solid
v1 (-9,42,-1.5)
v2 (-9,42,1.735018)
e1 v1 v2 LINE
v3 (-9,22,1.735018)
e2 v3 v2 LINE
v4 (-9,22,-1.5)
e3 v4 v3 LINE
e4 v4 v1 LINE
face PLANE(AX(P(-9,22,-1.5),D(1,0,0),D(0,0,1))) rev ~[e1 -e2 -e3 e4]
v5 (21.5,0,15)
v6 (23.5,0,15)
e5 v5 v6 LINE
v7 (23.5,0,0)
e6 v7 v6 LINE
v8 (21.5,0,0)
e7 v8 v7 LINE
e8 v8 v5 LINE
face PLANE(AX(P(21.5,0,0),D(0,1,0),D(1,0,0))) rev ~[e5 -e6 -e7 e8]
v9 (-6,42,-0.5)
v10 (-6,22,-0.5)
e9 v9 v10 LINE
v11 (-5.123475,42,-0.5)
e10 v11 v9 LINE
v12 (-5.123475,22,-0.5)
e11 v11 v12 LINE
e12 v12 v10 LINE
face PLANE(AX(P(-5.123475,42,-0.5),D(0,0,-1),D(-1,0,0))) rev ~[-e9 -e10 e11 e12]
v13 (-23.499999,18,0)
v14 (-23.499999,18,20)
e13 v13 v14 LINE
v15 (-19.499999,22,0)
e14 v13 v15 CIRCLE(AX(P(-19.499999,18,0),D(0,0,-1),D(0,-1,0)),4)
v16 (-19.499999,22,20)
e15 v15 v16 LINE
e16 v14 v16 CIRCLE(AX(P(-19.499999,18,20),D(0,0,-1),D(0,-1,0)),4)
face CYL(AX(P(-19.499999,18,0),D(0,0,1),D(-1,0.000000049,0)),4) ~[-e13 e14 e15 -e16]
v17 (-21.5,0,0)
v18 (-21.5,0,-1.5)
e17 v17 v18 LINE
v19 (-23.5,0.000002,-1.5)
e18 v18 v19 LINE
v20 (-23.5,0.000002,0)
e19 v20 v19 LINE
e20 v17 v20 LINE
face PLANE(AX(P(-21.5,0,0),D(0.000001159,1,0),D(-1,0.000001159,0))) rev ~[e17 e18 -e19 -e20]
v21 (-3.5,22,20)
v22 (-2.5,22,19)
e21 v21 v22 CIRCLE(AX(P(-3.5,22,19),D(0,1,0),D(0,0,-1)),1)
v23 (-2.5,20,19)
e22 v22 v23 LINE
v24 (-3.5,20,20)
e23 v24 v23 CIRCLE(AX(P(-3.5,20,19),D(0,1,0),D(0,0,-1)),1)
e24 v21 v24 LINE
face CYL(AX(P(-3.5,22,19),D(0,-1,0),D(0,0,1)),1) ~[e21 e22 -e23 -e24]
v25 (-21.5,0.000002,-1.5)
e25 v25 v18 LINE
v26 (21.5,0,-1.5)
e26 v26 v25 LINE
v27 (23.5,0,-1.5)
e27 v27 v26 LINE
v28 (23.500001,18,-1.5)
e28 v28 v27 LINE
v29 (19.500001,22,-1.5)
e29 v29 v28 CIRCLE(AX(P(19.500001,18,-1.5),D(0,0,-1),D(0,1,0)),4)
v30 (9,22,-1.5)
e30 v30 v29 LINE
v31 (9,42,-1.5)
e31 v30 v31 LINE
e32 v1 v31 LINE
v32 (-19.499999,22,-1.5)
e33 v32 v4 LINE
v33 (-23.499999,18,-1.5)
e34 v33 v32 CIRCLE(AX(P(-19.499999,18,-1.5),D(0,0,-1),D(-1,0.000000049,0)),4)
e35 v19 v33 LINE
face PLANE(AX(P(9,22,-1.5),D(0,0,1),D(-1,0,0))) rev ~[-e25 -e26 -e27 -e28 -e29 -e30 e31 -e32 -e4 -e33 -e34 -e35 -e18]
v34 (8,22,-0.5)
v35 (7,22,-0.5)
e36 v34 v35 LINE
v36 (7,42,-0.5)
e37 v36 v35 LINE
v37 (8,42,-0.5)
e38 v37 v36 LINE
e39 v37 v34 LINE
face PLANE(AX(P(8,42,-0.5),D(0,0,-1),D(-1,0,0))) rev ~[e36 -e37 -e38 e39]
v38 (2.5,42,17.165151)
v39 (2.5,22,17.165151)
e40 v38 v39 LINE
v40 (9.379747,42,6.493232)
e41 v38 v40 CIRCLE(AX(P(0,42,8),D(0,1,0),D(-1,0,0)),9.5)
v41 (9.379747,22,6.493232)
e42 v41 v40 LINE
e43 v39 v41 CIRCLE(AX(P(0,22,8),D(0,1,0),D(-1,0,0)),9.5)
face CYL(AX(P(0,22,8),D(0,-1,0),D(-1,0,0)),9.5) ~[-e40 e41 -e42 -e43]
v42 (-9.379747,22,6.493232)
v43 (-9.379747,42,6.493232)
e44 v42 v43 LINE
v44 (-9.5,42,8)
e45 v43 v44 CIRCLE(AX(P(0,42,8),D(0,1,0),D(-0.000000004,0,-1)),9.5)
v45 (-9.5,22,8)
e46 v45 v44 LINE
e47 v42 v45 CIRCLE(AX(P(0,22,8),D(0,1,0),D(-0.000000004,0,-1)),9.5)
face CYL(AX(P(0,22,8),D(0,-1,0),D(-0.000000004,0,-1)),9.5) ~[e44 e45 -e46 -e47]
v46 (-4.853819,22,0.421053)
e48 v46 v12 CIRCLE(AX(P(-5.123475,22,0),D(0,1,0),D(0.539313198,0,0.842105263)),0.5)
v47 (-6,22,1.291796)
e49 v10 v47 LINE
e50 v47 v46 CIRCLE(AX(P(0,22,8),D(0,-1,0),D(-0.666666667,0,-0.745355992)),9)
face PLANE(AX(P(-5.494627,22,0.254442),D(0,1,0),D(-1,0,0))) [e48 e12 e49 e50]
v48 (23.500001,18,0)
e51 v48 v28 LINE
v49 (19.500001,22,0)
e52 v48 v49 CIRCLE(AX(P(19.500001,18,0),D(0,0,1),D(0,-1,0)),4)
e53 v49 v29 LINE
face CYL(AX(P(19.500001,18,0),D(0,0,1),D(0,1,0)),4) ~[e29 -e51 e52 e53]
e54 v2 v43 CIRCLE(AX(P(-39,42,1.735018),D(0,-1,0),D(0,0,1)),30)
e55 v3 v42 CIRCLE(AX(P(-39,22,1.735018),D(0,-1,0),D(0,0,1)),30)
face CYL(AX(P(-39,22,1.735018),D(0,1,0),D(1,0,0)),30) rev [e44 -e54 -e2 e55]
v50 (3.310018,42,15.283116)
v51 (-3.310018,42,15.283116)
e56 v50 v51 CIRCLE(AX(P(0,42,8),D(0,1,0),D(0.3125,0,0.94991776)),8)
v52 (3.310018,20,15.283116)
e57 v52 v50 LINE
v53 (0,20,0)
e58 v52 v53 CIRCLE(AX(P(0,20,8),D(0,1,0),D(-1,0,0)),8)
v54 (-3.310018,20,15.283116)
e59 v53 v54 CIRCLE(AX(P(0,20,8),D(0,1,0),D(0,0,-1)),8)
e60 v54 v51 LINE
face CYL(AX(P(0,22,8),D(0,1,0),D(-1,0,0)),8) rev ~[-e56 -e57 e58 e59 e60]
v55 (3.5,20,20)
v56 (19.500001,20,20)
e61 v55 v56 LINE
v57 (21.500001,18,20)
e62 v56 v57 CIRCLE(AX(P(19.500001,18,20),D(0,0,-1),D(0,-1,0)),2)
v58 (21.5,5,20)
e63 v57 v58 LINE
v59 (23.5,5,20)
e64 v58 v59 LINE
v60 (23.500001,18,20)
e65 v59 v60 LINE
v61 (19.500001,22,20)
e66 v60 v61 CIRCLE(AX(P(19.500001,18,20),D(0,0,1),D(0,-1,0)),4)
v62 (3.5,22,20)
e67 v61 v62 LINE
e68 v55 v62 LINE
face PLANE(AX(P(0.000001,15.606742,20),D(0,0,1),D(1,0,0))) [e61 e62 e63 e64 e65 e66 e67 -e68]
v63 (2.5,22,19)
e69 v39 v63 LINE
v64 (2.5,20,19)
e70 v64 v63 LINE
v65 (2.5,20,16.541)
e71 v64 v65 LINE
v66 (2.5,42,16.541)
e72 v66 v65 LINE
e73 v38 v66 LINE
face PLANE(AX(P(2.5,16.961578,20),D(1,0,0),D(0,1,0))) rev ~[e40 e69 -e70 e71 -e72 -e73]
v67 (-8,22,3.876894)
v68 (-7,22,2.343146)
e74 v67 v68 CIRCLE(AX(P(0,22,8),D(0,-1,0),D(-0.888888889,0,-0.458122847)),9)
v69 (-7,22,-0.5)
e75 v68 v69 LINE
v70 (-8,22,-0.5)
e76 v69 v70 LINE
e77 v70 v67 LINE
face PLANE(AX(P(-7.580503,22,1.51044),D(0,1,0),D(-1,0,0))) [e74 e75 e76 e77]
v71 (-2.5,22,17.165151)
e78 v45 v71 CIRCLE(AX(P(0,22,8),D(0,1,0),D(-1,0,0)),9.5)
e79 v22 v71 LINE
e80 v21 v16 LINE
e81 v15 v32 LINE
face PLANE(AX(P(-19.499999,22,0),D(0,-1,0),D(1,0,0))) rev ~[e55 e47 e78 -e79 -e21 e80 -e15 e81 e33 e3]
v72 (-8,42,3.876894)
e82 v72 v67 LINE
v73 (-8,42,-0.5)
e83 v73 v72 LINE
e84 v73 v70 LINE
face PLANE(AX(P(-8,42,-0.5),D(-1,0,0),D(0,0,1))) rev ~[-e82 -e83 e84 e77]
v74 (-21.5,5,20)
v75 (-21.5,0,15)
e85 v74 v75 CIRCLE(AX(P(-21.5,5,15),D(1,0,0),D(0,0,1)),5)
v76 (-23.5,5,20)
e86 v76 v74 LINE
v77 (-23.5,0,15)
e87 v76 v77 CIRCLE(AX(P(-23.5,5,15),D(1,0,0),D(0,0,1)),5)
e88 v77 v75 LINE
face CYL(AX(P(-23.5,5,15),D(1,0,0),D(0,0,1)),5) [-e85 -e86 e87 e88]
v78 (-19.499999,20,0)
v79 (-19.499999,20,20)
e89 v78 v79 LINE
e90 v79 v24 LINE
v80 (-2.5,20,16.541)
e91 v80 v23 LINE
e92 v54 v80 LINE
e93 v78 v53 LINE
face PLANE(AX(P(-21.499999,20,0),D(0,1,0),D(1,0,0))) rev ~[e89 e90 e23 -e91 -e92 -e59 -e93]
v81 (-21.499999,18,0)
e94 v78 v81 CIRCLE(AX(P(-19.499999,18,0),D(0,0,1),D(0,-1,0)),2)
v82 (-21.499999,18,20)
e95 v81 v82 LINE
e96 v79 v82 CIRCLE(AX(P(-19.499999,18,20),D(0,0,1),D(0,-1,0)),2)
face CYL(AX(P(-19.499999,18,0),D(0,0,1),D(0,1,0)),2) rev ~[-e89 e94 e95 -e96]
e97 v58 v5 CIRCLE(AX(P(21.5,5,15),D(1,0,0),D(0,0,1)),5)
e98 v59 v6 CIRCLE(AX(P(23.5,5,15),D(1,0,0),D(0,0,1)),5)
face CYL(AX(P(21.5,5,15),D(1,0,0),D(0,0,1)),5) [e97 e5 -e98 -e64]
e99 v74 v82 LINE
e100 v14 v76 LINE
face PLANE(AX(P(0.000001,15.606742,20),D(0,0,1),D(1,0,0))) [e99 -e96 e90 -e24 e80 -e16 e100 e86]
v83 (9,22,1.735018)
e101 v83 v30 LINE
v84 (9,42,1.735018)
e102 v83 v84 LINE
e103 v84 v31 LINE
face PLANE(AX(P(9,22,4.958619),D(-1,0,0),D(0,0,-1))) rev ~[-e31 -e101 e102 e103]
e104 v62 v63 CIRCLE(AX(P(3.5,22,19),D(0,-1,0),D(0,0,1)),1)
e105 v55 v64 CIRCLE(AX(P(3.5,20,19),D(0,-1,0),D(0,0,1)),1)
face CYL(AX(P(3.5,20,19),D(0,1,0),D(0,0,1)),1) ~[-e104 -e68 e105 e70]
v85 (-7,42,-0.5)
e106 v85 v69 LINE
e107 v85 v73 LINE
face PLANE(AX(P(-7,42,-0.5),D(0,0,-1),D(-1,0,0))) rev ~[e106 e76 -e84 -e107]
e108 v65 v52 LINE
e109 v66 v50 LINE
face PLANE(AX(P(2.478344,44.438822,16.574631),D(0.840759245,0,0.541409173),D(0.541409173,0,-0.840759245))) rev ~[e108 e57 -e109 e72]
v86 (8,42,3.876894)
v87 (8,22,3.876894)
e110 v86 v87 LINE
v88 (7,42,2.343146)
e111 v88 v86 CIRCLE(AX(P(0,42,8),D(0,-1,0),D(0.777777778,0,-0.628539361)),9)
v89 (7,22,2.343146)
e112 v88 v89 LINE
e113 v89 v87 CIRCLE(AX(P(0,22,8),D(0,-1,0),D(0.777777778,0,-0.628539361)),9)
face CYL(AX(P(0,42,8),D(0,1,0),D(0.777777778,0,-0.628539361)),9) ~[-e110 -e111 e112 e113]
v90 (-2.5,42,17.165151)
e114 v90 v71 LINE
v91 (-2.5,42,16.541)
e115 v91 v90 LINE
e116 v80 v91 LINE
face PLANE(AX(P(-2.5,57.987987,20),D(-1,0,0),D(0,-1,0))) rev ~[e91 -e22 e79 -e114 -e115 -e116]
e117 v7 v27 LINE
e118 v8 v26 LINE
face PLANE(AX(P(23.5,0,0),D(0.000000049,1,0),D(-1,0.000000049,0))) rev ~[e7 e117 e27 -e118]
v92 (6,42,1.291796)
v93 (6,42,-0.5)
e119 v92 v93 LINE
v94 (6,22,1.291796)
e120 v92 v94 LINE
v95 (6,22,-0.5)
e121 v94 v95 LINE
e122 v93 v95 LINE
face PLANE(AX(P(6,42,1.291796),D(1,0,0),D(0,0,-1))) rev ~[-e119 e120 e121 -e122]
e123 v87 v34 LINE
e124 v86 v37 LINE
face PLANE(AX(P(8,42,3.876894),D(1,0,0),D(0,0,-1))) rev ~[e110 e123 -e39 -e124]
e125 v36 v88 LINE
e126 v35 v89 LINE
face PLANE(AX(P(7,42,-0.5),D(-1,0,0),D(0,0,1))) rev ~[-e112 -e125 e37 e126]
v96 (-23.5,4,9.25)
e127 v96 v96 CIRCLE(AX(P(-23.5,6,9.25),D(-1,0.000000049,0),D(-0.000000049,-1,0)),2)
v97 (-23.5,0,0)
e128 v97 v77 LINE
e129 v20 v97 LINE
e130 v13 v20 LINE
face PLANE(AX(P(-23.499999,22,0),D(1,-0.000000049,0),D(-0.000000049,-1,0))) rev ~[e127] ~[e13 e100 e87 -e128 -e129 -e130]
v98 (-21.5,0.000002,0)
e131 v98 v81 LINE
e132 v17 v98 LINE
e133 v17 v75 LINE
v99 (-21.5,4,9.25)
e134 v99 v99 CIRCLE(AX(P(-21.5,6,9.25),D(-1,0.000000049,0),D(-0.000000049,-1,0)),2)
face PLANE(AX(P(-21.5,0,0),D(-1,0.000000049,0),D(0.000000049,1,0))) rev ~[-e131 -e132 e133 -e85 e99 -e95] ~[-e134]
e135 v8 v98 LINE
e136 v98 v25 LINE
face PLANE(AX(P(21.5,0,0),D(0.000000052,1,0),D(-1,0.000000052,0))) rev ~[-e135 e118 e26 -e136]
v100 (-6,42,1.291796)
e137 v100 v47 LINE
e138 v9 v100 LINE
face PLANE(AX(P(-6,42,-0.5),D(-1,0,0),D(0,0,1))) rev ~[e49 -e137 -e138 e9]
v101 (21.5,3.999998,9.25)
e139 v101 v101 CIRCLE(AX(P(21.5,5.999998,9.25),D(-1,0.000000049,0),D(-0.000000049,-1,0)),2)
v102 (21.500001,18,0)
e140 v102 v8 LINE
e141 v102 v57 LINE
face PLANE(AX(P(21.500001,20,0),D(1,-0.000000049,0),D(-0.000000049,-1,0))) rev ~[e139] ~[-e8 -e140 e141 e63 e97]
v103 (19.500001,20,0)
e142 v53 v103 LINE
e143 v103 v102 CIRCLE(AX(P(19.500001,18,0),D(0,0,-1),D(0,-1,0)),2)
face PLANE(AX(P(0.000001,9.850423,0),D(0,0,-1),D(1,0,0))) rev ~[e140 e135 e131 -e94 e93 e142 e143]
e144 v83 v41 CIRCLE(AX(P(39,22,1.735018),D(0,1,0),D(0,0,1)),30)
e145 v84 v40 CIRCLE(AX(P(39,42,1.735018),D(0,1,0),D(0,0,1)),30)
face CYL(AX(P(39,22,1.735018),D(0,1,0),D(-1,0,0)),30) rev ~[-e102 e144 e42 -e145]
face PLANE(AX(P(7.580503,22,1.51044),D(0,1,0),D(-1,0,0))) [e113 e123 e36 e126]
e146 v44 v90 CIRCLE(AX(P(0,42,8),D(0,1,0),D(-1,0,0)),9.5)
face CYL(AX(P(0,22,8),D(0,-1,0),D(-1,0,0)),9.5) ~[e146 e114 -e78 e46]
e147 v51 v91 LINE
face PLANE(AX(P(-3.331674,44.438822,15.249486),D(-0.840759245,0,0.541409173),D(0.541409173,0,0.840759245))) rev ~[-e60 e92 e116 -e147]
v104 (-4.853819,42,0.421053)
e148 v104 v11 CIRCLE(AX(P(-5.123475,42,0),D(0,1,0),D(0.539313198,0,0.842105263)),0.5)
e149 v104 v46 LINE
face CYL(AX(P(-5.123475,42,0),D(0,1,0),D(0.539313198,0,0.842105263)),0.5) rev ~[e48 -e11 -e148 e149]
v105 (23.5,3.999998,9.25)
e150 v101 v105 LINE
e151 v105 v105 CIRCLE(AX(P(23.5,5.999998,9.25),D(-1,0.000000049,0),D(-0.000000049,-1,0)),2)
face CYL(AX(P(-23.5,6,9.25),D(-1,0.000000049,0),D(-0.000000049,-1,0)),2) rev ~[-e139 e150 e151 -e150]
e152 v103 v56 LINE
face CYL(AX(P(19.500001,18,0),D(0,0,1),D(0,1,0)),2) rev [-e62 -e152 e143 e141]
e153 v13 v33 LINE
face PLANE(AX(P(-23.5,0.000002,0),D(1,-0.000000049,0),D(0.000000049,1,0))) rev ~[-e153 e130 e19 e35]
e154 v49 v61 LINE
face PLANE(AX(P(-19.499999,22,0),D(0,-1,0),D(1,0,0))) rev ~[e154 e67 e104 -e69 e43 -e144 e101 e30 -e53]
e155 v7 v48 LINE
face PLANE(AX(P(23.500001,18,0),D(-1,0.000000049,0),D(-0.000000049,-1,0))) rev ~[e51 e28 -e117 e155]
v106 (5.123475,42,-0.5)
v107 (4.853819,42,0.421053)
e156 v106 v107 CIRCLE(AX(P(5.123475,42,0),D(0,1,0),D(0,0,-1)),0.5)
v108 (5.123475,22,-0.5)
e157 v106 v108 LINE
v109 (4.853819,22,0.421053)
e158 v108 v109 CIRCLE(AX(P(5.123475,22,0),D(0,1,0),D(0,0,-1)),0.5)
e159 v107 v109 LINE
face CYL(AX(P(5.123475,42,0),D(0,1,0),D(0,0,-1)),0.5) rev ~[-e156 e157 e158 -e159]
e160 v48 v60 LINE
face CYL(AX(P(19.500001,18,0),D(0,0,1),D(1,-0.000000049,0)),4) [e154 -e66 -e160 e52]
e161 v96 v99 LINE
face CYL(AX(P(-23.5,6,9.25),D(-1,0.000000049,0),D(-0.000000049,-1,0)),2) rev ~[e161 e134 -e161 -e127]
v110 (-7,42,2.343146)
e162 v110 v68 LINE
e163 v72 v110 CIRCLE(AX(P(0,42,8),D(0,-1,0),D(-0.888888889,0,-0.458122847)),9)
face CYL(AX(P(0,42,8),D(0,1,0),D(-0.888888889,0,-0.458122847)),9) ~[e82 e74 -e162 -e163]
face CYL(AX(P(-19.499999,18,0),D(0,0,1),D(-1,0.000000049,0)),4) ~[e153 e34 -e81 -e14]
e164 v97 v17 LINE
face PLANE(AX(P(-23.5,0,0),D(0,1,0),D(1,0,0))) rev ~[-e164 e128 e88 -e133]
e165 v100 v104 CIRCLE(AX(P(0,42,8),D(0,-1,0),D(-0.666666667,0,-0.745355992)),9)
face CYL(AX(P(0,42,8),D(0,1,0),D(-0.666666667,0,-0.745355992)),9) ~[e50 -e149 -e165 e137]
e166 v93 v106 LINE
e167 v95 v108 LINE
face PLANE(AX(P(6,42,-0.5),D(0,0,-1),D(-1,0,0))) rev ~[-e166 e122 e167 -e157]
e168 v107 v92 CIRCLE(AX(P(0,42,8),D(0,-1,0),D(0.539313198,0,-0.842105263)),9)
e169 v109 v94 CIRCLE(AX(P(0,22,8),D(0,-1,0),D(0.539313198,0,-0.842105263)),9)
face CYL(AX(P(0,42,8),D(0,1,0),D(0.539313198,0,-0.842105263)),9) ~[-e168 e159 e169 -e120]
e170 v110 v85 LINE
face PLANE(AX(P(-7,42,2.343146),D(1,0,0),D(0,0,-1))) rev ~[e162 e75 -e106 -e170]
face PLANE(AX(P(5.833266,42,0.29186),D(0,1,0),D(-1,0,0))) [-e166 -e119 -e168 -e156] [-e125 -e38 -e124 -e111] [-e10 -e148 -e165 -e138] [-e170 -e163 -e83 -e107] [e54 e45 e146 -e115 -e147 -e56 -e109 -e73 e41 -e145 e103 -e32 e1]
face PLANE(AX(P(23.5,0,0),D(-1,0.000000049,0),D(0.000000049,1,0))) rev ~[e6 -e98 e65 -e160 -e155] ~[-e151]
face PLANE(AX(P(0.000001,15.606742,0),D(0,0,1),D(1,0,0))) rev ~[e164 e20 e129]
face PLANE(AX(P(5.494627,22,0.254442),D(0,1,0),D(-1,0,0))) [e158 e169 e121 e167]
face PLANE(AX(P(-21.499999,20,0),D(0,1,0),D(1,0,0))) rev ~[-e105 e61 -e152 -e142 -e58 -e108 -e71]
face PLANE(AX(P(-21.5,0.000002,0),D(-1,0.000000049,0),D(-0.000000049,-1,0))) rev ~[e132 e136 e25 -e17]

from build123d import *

# Parameters (mm, degrees)
F1_DEPTH     = 20
F2_R         = 2
F3_R         = 4
F5_DEPTH     = 1.5
F6_R         = 8
F7_DEPTH     = 20
F8_DEPTH     = 25
F9_W         = 5
F9_H         = 35.9879870677
F9_H_2       = 3.0384219572
F9_H_3       = 2
F10_DEPTH    = 12.4
F11_T1_DEPTH = 26.8776444438
F12_R        = 1
F13_R        = 5
F15_DEPTH    = 20
F17_DEPTH    = 20
F18_R        = 30
F19_R        = 2
F20_DEPTH    = 58


# Not quite as in the source:
# - a fillet or chamfer that OpenCascade refuses, or shapes differently, is made with other operations: its cross-section is extruded or revolved along the edge and cut away or added
# - ends of sketch curves that miss each other by under 0.0002 mm in the source are joined


with BuildPart() as f1:
    # F0 (on Top) → F1 (new body)
    with BuildSketch(Plane.XY):
        Polygon((-21.4999990134, 20), (21.5000009866, 20), (21.5, 0), (23.5, 0), (23.5000010853, 22), (-23.4999989147, 22), (-23.5, 0), (-21.5, 0), align=None)
    extrude(amount=F1_DEPTH)

    # F2
    f2_edges = [f1.edges().sort_by_distance(p)[0] for p in [
        (-21.499999, 20, 10),
        (21.500001, 20, 10),
    ]]
    fillet(f2_edges, radius=F2_R)

    # F3
    f3_edges = [f1.edges().sort_by_distance(p)[0] for p in [
        (-23.499999, 22, 10),
        (23.500001, 22, 10),
    ]]
    fillet(f3_edges, radius=F3_R)

    # F4 (on face) → F5 (join)
    with BuildSketch(Plane(origin=(0, 0, 0), x_dir=(1, 0, 0), z_dir=(0, 0, -1))):
        with BuildLine():
            Line((21.500000888, -17.9999999013), (21.5, 0))
            Line((21.5, 0), (-21.5, -2.2199e-06))
            Line((-21.5, -2.2199e-06), (-21.499999112, -18.0000000987))
            ThreePointArc((-21.499999112, -18.0000000987), (-20.9142126395, -19.4142135973), (-19.499999112, -20))
            Line((-19.499999112, -20), (19.500000888, -20))
            ThreePointArc((19.500000888, -20), (20.9142144852, -19.4142135275), (21.500000888, -17.9999999013))
        make_face()
        with BuildLine():
            ThreePointArc((19.500000888, -22), (22.3284280825, -20.828427055), (23.500000888, -17.9999998027))
            Line((23.500000888, -17.9999998027), (23.5, 0))
            Line((23.5, 0), (21.5, -9.87e-08))
            Line((21.5, -9.87e-08), (21.500000888, -17.9999999013))
            ThreePointArc((21.500000888, -17.9999999013), (20.9142144852, -19.4142135275), (19.500000888, -20))
            Line((19.500000888, -20), (-19.499999112, -20))
            ThreePointArc((-19.499999112, -20), (-20.9142126395, -19.4142135973), (-21.499999112, -18.0000000987))
            Line((-21.499999112, -18.0000000987), (-21.5, 0))
            Line((-21.5, 0), (-23.5, -2.3186e-06))
            Line((-23.5, -2.3186e-06), (-23.499999112, -18.0000001973))
            ThreePointArc((-23.499999112, -18.0000001973), (-22.328426167, -20.8284271945), (-19.499999112, -22))
            Line((-19.499999112, -22), (19.500000888, -22))
        make_face()
    extrude(amount=F5_DEPTH)

    # F6 (on face) → F7 (join)
    with BuildSketch(Plane(origin=(0, 22, 0), x_dir=(-1, 0, 0), z_dir=(0, 1, 0))):
        with BuildLine():
            ThreePointArc((4.21e-08, -1.5), (6.7175144362, 1.2824855936), (9.5, 8))
            ThreePointArc((9.5, 8), (-6.7175144362, 14.7175144064), (4.21e-08, -1.5))
        make_face()
        with Locations((0, 8)):
            Circle(F6_R, mode=Mode.SUBTRACT)
    extrude(amount=F7_DEPTH)

    # F8 (cut): a face of the model
    f8_faces = [f1.faces().sort_by_distance(p)[0] for p in [
        (0, 22, 8),
    ]]
    extrude(f8_faces, amount=-F8_DEPTH, mode=Mode.SUBTRACT)

    # F9 (on face) → F10 (cut)
    with BuildSketch(Plane.XY.offset(20)):
        with Locations((0, 39.9939935338)):
            Rectangle(F9_W, F9_H)
        with Locations((0, 18.4807890214)):
            Rectangle(F9_W, F9_H_2)
        with Locations((0, 21)):
            Rectangle(F9_W, F9_H_3)
    extrude(amount=-F10_DEPTH, mode=Mode.SUBTRACT)

    # F11: chamfer of 1 on 2 edges, made by hand

    # F11_s2 → F11_t1 (cut)
    with BuildSketch(Plane.XZ.offset(-44.4388222219)):
        with BuildLine():
            Line((-3.3316740869, 15.2494859065), (-2.4783436331, 16.5746305544))
            Line((-2.4783436331, 16.5746305544), (-2.4583436331, 16.5746305544))
            ThreePointArc((-2.4583436331, 16.5746305544), (-2.48, 16.0869863156), (-2.48, 15.5993420768))
            Line((-2.48, 15.5993420768), (-2.49375, 15.5803437216))
            ThreePointArc((-2.49375, 15.5803437216), (-2.9171284808, 15.4277022979), (-3.3233990426, 15.2312781158))
            Line((-3.3233990426, 15.2312781158), (-3.3316740869, 15.2494859065))
        make_face()
        with BuildLine():
            Line((2.4783436331, 16.5746305544), (3.3316740869, 15.2494859065))
            Line((3.3316740869, 15.2494859065), (3.3233990426, 15.2312781158))
            ThreePointArc((3.3233990426, 15.2312781158), (2.9171284808, 15.4277022979), (2.49375, 15.5803437216))
            Line((2.49375, 15.5803437216), (2.48, 15.5993420768))
            ThreePointArc((2.48, 15.5993420768), (2.48, 16.0869863156), (2.4583436331, 16.5746305544))
            Line((2.4583436331, 16.5746305544), (2.4783436331, 16.5746305544))
        make_face()
    extrude(amount=F11_T1_DEPTH, mode=Mode.SUBTRACT)

    # F12
    f12_edges = [f1.edges().sort_by_distance(p)[0] for p in [
        (2.5, 21, 20),
        (-2.5, 21, 20),
    ]]
    fillet(f12_edges, radius=F12_R)

    # F13
    f13_edges = [f1.edges().sort_by_distance(p)[0] for p in [
        (-22.5, 0, 20),
        (22.5, 0, 20),
    ]]
    fillet(f13_edges, radius=F13_R)

    # F14 (on face) → F15 (join)
    with BuildSketch(Plane(origin=(0, 22, 0), x_dir=(-1, 0, 0), z_dir=(0, 1, 0))):
        with BuildLine():
            ThreePointArc((2.1e-08, -1.5), (-5.5388120473, 0.2817384662), (-9, 4.9586187349))
            Line((-9, 4.9586187349), (-9, -1.5))
            Line((-9, -1.5), (0, -1.5))
        make_face()
        with BuildLine():
            ThreePointArc((9, 4.9586187349), (5.5388120644, 0.2817384785), (2.1e-08, -1.5))
            Line((0, -1.5), (9, -1.5))
            Line((9, -1.5), (9, 4.9586187349))
        make_face()
    extrude(amount=F15_DEPTH)

    # F16 (on face) → F17 (cut)
    with BuildSketch(Plane(origin=(0, 42, 0), x_dir=(-1, 0, 0), z_dir=(0, 1, 0))):
        with BuildLine():
            ThreePointArc((-7, 2.3431457505), (-7.53910447, 3.0845240526), (-8, 3.8768943744))
            Line((-8, 3.8768943744), (-8, -0.5))
            Line((-8, -0.5), (-7, -0.5))
            Line((-7, -0.5), (-7, 2.3431457505))
        make_face()
        with BuildLine():
            Line((8, -0.5), (8, 3.8768943744))
            ThreePointArc((8, 3.8768943744), (7.53910447, 3.0845240526), (7, 2.3431457505))
            Line((7, 2.3431457505), (7, -0.5))
            Line((7, -0.5), (8, -0.5))
        make_face()
        with BuildLine():
            ThreePointArc((-4.8538187839, 0.4210526316), (-5.4443451471, 0.8334732318), (-6, 1.2917960675))
            Line((-6, 1.2917960675), (-6, -0.5))
            Line((-6, -0.5), (-5.123475383, -0.5))
            ThreePointArc((-5.123475383, -0.5), (-4.643617948, -0.1404878717), (-4.8538187839, 0.4210526316))
        make_face()
        with BuildLine():
            Line((6, -0.5), (6, 1.2917960675))
            ThreePointArc((6, 1.2917960675), (5.4443451471, 0.8334732318), (4.8538187839, 0.4210526316))
            ThreePointArc((4.8538187839, 0.4210526316), (4.643617948, -0.1404878717), (5.123475383, -0.5))
            Line((5.123475383, -0.5), (6, -0.5))
        make_face()
    extrude(amount=-F17_DEPTH, mode=Mode.SUBTRACT)

    # F18
    f18_edges = [f1.edges().sort_by_distance(p)[0] for p in [
        (-9, 32, 4.958619),
        (9, 32, 4.958619),
    ]]
    fillet(f18_edges, radius=F18_R)

    # F19 (on face) → F20 (cut)
    with BuildSketch(Plane(origin=(-23.5, 1.1593e-06, 0), x_dir=(-4.93e-08, -1, 0), z_dir=(-1, 4.93e-08, 0))):
        with Locations((-5.999999038, 9.25)):
            Circle(F19_R)
    extrude(amount=-F20_DEPTH, mode=Mode.SUBTRACT)


solid = f1.part
